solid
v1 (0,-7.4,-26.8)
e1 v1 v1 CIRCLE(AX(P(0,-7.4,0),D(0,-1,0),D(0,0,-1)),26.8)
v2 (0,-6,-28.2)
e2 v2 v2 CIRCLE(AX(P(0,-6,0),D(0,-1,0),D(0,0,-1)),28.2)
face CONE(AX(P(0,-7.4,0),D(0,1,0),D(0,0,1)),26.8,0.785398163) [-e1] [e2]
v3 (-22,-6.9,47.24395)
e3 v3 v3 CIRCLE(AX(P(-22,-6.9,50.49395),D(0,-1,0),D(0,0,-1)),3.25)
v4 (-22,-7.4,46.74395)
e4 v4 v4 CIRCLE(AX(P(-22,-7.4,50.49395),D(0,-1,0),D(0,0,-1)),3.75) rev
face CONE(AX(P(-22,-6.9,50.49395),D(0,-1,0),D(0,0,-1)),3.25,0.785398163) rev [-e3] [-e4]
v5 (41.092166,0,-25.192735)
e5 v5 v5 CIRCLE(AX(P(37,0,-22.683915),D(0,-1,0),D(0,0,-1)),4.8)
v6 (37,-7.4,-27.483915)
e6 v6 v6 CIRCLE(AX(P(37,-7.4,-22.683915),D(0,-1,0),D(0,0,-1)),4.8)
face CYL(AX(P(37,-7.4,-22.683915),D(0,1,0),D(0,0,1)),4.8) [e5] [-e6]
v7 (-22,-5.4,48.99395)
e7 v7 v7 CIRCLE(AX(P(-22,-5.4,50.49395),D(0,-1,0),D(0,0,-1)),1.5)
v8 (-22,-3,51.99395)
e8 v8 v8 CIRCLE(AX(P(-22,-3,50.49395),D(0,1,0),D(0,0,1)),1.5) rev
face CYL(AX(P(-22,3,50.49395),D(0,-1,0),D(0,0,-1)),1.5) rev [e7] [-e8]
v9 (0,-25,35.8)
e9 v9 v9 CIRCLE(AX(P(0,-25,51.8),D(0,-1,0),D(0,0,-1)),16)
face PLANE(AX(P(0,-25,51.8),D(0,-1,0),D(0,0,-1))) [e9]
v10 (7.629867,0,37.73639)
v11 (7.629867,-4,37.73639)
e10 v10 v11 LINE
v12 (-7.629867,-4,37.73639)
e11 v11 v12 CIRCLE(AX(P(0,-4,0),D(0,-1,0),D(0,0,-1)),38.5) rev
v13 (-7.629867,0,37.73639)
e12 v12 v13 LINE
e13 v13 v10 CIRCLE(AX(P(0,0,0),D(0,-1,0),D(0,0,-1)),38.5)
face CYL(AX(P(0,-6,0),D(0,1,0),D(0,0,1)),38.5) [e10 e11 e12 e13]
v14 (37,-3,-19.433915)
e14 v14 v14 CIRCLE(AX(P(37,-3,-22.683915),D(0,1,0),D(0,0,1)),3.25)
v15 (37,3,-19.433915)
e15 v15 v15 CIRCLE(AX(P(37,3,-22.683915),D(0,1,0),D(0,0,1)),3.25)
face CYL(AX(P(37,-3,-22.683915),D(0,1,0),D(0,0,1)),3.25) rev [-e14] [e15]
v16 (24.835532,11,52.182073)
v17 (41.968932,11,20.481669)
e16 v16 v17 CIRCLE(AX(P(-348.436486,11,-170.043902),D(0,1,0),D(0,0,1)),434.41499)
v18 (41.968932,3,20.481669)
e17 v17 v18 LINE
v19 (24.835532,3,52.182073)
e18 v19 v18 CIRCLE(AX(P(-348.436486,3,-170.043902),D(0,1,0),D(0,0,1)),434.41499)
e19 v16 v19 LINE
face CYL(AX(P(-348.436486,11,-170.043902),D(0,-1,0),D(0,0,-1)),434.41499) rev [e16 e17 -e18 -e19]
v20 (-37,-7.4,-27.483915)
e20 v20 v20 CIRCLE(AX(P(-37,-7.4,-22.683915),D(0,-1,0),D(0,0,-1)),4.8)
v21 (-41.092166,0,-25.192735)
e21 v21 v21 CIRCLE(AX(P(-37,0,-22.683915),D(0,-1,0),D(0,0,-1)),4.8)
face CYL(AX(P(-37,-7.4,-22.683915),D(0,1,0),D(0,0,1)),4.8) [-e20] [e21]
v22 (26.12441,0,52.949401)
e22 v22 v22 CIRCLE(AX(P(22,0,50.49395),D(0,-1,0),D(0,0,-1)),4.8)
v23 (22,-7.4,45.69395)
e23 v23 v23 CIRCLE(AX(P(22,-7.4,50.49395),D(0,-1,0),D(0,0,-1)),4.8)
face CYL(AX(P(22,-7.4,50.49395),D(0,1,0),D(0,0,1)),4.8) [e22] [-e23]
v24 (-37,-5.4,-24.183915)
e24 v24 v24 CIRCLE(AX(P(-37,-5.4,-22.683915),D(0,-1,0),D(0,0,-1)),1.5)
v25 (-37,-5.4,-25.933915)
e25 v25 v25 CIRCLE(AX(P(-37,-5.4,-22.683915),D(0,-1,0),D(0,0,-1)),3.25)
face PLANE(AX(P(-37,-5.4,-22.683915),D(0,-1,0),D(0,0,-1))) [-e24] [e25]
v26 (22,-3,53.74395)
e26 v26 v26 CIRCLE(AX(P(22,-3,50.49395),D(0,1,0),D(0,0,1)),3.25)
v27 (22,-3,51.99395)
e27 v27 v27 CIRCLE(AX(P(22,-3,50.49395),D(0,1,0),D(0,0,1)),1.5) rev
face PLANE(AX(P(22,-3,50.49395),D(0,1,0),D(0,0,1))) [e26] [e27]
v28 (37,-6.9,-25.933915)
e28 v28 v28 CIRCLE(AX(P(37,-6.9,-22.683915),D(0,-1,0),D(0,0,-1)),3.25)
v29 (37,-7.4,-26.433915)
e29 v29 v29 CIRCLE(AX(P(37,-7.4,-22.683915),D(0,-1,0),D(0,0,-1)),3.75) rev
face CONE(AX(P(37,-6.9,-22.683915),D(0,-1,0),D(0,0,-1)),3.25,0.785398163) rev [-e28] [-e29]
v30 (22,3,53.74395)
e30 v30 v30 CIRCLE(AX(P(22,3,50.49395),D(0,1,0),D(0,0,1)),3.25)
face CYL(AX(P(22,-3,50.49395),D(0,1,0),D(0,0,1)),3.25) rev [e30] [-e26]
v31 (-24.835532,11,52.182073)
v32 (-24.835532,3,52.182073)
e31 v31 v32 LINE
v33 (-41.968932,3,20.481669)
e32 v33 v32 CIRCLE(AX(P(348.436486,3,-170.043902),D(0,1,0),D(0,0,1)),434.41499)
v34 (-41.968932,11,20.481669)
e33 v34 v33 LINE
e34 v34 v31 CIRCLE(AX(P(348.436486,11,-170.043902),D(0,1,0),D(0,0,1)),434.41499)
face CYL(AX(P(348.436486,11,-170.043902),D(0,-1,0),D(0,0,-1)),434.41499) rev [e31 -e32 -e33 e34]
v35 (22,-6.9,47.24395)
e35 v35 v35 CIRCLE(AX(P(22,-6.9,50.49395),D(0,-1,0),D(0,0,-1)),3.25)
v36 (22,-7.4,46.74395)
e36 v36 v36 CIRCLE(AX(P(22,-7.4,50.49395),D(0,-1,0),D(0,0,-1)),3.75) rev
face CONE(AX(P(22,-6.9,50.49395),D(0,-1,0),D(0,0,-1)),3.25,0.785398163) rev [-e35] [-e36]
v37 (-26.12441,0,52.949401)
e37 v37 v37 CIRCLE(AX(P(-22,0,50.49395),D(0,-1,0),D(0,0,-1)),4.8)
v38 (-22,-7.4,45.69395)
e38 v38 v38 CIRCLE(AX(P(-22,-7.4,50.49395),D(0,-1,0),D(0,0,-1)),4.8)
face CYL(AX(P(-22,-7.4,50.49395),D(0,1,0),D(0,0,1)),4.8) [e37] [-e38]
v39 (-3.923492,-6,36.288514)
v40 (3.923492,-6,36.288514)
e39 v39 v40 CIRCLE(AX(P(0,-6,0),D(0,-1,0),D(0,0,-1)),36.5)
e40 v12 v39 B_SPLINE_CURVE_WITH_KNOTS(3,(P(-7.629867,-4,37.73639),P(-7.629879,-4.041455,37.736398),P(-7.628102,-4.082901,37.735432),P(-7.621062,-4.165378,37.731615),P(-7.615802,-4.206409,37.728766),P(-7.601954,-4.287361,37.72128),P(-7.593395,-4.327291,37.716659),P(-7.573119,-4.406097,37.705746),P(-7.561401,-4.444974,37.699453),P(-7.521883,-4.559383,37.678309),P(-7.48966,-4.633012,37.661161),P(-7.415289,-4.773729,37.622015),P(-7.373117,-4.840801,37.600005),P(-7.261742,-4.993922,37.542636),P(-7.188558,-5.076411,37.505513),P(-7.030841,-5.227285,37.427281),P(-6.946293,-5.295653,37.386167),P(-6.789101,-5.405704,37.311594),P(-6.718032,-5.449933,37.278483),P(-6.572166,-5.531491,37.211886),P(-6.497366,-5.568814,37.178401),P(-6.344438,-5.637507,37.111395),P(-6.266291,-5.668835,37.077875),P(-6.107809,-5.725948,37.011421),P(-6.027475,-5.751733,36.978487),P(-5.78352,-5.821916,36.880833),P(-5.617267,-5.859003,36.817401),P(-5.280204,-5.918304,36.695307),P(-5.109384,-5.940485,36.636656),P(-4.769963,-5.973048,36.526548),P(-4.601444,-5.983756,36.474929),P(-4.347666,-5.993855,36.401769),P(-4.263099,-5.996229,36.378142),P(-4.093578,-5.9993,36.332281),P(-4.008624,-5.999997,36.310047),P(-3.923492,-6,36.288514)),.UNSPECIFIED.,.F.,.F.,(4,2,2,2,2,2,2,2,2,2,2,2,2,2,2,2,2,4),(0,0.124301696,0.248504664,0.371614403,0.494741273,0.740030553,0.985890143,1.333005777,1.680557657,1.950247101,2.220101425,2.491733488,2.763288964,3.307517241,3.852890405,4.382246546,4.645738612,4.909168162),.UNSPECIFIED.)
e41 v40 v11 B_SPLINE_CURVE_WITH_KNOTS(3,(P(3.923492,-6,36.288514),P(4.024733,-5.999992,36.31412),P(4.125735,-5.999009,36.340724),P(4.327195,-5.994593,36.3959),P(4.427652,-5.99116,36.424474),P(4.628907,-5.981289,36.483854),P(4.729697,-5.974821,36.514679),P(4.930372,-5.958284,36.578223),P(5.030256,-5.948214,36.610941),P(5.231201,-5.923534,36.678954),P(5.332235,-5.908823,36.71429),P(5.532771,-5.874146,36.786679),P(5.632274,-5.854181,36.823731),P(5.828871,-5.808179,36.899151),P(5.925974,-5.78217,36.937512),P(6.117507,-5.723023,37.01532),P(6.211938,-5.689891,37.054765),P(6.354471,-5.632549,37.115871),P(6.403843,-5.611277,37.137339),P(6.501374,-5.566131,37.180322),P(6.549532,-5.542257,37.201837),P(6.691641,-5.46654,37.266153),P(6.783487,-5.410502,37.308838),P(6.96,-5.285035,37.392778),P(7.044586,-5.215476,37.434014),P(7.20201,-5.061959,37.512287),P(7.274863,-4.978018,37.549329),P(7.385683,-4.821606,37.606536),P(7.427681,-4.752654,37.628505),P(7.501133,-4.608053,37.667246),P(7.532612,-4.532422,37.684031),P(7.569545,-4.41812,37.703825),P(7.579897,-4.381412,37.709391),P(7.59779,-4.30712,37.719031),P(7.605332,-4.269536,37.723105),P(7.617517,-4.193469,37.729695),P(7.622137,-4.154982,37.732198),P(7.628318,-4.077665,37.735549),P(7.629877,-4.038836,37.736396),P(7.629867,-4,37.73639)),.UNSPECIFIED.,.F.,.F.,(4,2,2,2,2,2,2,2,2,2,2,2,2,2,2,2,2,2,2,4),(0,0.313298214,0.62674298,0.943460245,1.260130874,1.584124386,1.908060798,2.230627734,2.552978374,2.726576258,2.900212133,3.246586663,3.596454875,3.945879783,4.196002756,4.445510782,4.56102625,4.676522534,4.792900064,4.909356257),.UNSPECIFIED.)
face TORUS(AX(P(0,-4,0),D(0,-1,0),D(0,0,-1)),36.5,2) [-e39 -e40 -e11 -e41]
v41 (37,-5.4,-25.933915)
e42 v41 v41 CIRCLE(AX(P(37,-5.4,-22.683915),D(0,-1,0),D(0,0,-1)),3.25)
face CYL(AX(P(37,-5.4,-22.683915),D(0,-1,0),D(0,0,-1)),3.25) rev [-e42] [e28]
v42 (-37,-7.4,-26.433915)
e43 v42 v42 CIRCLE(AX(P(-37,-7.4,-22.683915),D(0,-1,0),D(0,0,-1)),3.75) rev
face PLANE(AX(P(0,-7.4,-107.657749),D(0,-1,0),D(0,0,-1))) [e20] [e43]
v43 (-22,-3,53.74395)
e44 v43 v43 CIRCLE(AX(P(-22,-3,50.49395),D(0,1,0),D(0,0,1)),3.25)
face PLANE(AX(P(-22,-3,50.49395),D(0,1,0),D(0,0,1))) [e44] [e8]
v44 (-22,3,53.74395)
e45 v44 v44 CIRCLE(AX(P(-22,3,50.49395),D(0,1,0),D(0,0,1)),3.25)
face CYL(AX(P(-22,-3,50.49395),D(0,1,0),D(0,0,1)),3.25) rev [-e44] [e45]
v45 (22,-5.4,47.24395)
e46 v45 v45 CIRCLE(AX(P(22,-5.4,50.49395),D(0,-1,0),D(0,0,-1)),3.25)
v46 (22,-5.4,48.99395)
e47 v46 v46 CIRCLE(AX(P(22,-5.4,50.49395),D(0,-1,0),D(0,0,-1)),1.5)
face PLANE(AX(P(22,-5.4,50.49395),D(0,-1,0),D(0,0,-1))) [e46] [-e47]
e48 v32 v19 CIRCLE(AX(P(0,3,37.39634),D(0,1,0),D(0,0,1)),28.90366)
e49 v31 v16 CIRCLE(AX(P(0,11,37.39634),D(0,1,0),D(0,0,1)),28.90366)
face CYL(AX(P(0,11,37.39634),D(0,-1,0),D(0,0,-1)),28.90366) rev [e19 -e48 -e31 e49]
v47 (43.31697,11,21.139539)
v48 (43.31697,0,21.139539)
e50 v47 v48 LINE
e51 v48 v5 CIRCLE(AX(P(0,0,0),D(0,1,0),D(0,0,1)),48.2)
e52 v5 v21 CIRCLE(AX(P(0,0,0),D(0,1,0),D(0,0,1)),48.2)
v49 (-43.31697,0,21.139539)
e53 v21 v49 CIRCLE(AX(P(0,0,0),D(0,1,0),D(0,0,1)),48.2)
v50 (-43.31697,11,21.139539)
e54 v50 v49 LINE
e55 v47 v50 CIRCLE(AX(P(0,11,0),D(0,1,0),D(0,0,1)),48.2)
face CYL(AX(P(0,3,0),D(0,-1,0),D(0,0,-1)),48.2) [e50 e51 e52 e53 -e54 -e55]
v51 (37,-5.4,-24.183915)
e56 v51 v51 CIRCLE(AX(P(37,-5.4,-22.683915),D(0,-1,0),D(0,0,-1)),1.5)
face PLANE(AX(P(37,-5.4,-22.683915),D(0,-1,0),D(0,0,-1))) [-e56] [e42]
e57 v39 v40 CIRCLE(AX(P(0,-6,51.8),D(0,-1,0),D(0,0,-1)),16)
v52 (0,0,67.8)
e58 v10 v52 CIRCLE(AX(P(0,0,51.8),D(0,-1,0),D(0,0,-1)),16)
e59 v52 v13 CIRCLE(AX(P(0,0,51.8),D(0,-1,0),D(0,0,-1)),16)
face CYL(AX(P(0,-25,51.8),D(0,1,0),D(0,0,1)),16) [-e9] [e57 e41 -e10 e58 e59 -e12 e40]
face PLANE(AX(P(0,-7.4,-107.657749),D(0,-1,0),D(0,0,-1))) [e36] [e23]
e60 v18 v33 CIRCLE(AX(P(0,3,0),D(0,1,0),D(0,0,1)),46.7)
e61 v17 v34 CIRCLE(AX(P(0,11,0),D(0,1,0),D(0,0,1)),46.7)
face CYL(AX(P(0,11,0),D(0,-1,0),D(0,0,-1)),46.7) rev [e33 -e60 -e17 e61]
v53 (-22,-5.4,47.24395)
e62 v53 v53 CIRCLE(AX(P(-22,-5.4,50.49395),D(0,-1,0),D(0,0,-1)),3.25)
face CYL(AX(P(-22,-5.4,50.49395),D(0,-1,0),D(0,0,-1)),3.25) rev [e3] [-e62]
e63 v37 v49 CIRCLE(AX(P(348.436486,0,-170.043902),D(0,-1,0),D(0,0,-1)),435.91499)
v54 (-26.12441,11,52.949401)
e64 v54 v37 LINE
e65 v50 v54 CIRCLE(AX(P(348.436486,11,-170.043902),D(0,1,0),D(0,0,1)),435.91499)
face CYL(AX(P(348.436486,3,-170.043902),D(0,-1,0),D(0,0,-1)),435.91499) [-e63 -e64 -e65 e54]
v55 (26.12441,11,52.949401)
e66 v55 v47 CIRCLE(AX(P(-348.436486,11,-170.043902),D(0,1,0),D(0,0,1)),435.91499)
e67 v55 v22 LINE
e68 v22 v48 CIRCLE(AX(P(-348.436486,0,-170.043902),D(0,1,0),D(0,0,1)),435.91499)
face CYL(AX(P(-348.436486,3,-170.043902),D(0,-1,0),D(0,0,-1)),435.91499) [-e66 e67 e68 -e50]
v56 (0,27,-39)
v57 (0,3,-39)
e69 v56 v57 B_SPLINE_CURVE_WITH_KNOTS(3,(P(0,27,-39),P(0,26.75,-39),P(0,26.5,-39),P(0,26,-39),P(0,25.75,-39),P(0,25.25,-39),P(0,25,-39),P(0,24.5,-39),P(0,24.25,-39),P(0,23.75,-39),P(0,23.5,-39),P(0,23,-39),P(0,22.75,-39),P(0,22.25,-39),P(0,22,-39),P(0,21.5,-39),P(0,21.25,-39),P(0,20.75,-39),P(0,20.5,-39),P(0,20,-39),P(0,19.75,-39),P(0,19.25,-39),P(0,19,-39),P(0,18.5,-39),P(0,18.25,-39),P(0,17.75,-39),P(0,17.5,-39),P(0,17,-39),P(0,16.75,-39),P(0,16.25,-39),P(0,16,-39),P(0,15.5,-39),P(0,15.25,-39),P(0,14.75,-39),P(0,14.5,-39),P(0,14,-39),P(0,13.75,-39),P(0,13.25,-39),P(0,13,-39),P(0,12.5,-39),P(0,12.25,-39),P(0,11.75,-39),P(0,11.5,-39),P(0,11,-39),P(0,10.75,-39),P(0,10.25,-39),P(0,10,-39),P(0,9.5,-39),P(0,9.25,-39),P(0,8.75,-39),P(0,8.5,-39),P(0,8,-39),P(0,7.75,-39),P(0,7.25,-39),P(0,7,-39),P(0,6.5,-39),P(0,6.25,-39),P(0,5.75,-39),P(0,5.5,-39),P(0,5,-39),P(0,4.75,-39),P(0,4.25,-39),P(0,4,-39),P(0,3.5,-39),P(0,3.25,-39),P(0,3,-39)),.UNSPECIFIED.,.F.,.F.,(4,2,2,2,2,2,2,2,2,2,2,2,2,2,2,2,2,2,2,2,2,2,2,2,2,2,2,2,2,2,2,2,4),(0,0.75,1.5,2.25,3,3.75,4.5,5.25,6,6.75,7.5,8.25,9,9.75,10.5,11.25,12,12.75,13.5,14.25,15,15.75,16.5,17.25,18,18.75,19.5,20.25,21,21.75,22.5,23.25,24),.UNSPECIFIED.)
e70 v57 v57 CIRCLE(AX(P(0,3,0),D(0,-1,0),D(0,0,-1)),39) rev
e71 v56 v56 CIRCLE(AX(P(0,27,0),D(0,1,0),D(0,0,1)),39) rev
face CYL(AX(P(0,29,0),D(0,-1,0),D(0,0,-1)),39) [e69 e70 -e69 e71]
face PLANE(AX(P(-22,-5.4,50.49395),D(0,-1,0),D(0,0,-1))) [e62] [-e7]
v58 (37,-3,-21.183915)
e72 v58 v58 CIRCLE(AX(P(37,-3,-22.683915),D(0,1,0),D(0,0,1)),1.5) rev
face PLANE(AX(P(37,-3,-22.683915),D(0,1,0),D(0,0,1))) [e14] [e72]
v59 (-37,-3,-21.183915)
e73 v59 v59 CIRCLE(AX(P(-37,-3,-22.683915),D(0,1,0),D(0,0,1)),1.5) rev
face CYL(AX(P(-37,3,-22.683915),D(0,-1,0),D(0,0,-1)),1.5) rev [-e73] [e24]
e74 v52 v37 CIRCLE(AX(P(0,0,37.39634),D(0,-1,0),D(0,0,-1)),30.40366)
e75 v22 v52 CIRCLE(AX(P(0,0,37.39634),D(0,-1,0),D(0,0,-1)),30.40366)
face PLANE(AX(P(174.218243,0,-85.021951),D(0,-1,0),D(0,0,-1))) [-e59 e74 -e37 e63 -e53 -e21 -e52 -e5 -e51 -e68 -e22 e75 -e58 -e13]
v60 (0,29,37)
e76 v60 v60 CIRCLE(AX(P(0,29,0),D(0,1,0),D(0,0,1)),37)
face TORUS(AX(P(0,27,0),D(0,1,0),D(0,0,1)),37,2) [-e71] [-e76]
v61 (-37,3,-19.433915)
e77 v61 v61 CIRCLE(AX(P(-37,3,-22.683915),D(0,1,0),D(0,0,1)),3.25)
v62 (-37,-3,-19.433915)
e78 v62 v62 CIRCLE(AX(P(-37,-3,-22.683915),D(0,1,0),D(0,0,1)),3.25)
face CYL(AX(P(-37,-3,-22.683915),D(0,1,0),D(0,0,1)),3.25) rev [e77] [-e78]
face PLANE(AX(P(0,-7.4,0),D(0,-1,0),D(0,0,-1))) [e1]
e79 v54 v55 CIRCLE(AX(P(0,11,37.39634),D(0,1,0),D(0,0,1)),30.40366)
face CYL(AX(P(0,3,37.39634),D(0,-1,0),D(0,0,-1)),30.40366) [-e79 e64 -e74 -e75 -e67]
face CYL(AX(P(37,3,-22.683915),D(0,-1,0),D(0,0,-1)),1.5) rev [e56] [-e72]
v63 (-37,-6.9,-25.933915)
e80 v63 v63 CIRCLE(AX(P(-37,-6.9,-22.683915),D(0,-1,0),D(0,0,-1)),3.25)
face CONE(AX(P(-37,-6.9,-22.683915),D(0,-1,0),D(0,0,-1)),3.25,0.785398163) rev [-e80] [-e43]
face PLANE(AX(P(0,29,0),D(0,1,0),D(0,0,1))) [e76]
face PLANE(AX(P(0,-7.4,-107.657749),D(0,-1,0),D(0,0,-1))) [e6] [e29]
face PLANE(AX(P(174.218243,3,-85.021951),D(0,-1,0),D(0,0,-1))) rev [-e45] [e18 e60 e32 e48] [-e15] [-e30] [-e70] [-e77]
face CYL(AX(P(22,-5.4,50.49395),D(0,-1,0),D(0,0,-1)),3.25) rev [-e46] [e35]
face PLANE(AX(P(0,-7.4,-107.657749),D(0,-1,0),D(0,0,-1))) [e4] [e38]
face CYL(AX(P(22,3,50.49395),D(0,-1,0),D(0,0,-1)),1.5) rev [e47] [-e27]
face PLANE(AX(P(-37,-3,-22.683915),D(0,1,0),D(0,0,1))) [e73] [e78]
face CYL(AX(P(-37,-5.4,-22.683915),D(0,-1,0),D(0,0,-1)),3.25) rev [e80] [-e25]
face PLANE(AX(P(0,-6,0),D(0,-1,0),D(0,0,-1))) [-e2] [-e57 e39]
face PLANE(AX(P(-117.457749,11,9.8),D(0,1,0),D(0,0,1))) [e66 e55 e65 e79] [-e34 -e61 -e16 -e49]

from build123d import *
from build123d.topology import SkipClean

# Parameters (mm, degrees)
BOSS_EXTRUDE2_DEPTH = 3
SKETCH3_R           = 4.8
BOSS_EXTRUDE3_DEPTH = 7.4
SKETCH6_R           = 16
BOSS_EXTRUDE6_DEPTH = 25
SKETCH4_R           = 38.5
BOSS_EXTRUDE4_DEPTH = 6
SKETCH5_R           = 28.2
BOSS_EXTRUDE5_DEPTH = 1.4
CHAMFER1_SIZE       = 1.4
FILLET2_R           = 2
SKETCH7_R           = 3.25
CUT_EXTRUDE1_DEPTH  = 2
CHAMFER2_SIZE       = 0.5
SKETCH9_R           = 1.5
CUT_EXTRUDE2_DEPTH  = 86.464847
BOSS_EXTRUDE7_DEPTH = 8
CUT_EXTRUDE3_START  = -6
SKETCH14_R          = 3.25
CUT_EXTRUDE3_DEPTH  = 6
SKETCH15_R          = 39
BOSS_EXTRUDE8_DEPTH = 26
FILLET3_R           = 2


with BuildPart() as part:
    # Sketch1 → Boss-Extrude2 (new body)
    with BuildSketch(Plane(origin=(0, 0, 0), x_dir=(1, 0, 0), z_dir=(0, 1, 0))):
        with BuildLine():
            ThreePointArc((26.12441, -52.949401), (0, -67.8), (-26.12441, -52.949401))
            ThreePointArc((-26.12441, -52.949401), (-35.050657, -37.22281), (-43.31697, -21.139539))
            ThreePointArc((-43.31697, -21.139539), (-40.878881, 25.537367), (0, 48.2))
            ThreePointArc((0, 48.2), (40.878881, 25.537367), (43.31697, -21.139539))
            ThreePointArc((43.31697, -21.139539), (35.050657, -37.22281), (26.12441, -52.949401))
        make_face()
    extrude(amount=BOSS_EXTRUDE2_DEPTH)

    # Sketch3 → Boss-Extrude3 (add)
    with BuildSketch(Plane.XZ):
        with Locations(Location((37, -22.683915, 0), (0, 0, 328.488032))):
            Circle(SKETCH3_R)
        with Locations(Location((-37, -22.683915, 0), (0, 0, 211.511188))):
            Circle(SKETCH3_R)
        with Locations(Location((-22, 50.49395, 0), (0, 0, 149.232316))):
            Circle(SKETCH3_R)
        with Locations(Location((22, 50.49395, 0), (0, 0, 30.76691))):
            Circle(SKETCH3_R)
    extrude(amount=BOSS_EXTRUDE3_DEPTH)

    # Sketch6 → Boss-Extrude6 (add)
    with BuildSketch(Plane.XZ):
        with Locations(Location((0, 51.8, 0), (0, 0, 89.999706))):
            Circle(SKETCH6_R)
    extrude(amount=BOSS_EXTRUDE6_DEPTH)

    # Sketch4 → Boss-Extrude4 (add)
    with BuildSketch(Plane.XZ):
        Circle(SKETCH4_R)
    extrude(amount=BOSS_EXTRUDE4_DEPTH)

    # Sketch5 → Boss-Extrude5 (add)
    with BuildSketch(Plane.XZ.offset(6)):
        with Locations(Location((0, 0, 0), (0, 0, 270))):
            Circle(SKETCH5_R)
    extrude(amount=BOSS_EXTRUDE5_DEPTH)

    # Chamfer1
    chamfer1_edges = [part.edges().sort_by_distance(p)[0] for p in [
        (0, -7.4, 28.2),
    ]]
    chamfer(chamfer1_edges, length=CHAMFER1_SIZE - 0.0001)  # a hair under: the kernel refuses the full size

    # Fillet2
    fillet2_edges = [part.edges().sort_by_distance(p)[0] for p in [
        (0, -6, -38.5),
    ]]
    fillet(fillet2_edges, radius=FILLET2_R)

    # Sketch7 → Cut-Extrude1 (cut)
    with BuildSketch(Plane.XZ.offset(7.4)):
        with Locations(Location((37, -22.683915, 0), (0, 0, 270))):
            Circle(SKETCH7_R)
        with Locations(Location((-37, -22.683915, 0), (0, 0, 270))):
            Circle(SKETCH7_R)
        with Locations(Location((-22, 50.49395, 0), (0, 0, 270))):
            Circle(SKETCH7_R)
        with Locations(Location((22, 50.49395, 0), (0, 0, 270))):
            Circle(SKETCH7_R)
    extrude(amount=-CUT_EXTRUDE1_DEPTH, mode=Mode.SUBTRACT)

    # Chamfer2
    chamfer2_edges = [part.edges().sort_by_distance(p)[0] for p in [
        (37, -7.4, -19.433915),
        (-37, -7.4, -19.433915),
        (-22, -7.4, 53.74395),
        (22, -7.4, 53.74395),
    ]]
    chamfer(chamfer2_edges, length=CHAMFER2_SIZE)

    # Sketch9 → Cut-Extrude2 (cut, through all)
    with BuildSketch(Plane.XZ.offset(5.4)):
        with Locations(Location((22, 50.49395, 0), (0, 0, 270))):
            Circle(SKETCH9_R)
        with Locations(Location((-22, 50.49395, 0), (0, 0, 270))):
            Circle(SKETCH9_R)
        with Locations(Location((-37, -22.683915, 0), (0, 0, 270))):
            Circle(SKETCH9_R)
        with Locations(Location((37, -22.683915, 0), (0, 0, 270))):
            Circle(SKETCH9_R)
    extrude(amount=-CUT_EXTRUDE2_DEPTH, mode=Mode.SUBTRACT)

    # Sketch10 → Boss-Extrude7 (add)
    with SkipClean():  # the faces are left unmerged after this step: merging them gives an invalid solid
        with BuildSketch(Plane(origin=(0, 3, 0), x_dir=(1, 0, 0), z_dir=(0, 1, 0))):
            with BuildLine():
                ThreePointArc((0, 48.2), (-40.878881, 25.537367), (-43.31697, -21.139539))
                ThreePointArc((-43.31697, -21.139539), (-35.050657, -37.22281), (-26.12441, -52.949401))
                ThreePointArc((-26.12441, -52.949401), (0, -67.8), (26.12441, -52.949401))
                ThreePointArc((26.12441, -52.949401), (35.050657, -37.22281), (43.31697, -21.139539))
                ThreePointArc((43.31697, -21.139539), (40.878881, 25.537367), (0, 48.2))
            make_face()
            with BuildLine():
                ThreePointArc((41.968932, -20.481669), (33.731063, -36.509597), (24.835532, -52.182073))
                ThreePointArc((24.835532, -52.182073), (0, -66.3), (-24.835532, -52.182073))
                ThreePointArc((-24.835532, -52.182073), (-33.731063, -36.509597), (-41.968932, -20.481669))
                ThreePointArc((-41.968932, -20.481669), (0, 46.7), (41.968932, -20.481669))
            make_face(mode=Mode.SUBTRACT)
        extrude(amount=BOSS_EXTRUDE7_DEPTH)

    # Sketch14 → Cut-Extrude3 (cut)
    with SkipClean():  # the faces are left unmerged after this step: merging them gives an invalid solid
        with BuildSketch(Plane(origin=(0, 3, 0), x_dir=(1, 0, 0), z_dir=(0, 1, 0)).offset(CUT_EXTRUDE3_START)):
            with Locations(Location((-37, 22.683915, 0), (0, 0, 90))):
                Circle(SKETCH14_R)
            with Locations(Location((37, 22.683915, 0), (0, 0, 90))):
                Circle(SKETCH14_R)
            with Locations(Location((22, -50.49395, 0), (0, 0, 90))):
                Circle(SKETCH14_R)
            with Locations(Location((-22, -50.49395, 0), (0, 0, 90))):
                Circle(SKETCH14_R)
        extrude(amount=CUT_EXTRUDE3_DEPTH, mode=Mode.SUBTRACT)

    # Sketch15 → Boss-Extrude8 (add)
    with SkipClean():  # the faces are left unmerged after this step: merging them gives an invalid solid
        with BuildSketch(Plane(origin=(0, 3, 0), x_dir=(1, 0, 0), z_dir=(0, 1, 0))):
            with Locations(Location((0, 0, 0), (0, 0, 90))):
                Circle(SKETCH15_R)
        extrude(amount=BOSS_EXTRUDE8_DEPTH)

    # Fillet3
    fillet3_edges = [part.edges().sort_by_distance(p)[0] for p in [
        (0, 29, 39),
    ]]
    fillet(fillet3_edges, radius=FILLET3_R)


solid = part.part
